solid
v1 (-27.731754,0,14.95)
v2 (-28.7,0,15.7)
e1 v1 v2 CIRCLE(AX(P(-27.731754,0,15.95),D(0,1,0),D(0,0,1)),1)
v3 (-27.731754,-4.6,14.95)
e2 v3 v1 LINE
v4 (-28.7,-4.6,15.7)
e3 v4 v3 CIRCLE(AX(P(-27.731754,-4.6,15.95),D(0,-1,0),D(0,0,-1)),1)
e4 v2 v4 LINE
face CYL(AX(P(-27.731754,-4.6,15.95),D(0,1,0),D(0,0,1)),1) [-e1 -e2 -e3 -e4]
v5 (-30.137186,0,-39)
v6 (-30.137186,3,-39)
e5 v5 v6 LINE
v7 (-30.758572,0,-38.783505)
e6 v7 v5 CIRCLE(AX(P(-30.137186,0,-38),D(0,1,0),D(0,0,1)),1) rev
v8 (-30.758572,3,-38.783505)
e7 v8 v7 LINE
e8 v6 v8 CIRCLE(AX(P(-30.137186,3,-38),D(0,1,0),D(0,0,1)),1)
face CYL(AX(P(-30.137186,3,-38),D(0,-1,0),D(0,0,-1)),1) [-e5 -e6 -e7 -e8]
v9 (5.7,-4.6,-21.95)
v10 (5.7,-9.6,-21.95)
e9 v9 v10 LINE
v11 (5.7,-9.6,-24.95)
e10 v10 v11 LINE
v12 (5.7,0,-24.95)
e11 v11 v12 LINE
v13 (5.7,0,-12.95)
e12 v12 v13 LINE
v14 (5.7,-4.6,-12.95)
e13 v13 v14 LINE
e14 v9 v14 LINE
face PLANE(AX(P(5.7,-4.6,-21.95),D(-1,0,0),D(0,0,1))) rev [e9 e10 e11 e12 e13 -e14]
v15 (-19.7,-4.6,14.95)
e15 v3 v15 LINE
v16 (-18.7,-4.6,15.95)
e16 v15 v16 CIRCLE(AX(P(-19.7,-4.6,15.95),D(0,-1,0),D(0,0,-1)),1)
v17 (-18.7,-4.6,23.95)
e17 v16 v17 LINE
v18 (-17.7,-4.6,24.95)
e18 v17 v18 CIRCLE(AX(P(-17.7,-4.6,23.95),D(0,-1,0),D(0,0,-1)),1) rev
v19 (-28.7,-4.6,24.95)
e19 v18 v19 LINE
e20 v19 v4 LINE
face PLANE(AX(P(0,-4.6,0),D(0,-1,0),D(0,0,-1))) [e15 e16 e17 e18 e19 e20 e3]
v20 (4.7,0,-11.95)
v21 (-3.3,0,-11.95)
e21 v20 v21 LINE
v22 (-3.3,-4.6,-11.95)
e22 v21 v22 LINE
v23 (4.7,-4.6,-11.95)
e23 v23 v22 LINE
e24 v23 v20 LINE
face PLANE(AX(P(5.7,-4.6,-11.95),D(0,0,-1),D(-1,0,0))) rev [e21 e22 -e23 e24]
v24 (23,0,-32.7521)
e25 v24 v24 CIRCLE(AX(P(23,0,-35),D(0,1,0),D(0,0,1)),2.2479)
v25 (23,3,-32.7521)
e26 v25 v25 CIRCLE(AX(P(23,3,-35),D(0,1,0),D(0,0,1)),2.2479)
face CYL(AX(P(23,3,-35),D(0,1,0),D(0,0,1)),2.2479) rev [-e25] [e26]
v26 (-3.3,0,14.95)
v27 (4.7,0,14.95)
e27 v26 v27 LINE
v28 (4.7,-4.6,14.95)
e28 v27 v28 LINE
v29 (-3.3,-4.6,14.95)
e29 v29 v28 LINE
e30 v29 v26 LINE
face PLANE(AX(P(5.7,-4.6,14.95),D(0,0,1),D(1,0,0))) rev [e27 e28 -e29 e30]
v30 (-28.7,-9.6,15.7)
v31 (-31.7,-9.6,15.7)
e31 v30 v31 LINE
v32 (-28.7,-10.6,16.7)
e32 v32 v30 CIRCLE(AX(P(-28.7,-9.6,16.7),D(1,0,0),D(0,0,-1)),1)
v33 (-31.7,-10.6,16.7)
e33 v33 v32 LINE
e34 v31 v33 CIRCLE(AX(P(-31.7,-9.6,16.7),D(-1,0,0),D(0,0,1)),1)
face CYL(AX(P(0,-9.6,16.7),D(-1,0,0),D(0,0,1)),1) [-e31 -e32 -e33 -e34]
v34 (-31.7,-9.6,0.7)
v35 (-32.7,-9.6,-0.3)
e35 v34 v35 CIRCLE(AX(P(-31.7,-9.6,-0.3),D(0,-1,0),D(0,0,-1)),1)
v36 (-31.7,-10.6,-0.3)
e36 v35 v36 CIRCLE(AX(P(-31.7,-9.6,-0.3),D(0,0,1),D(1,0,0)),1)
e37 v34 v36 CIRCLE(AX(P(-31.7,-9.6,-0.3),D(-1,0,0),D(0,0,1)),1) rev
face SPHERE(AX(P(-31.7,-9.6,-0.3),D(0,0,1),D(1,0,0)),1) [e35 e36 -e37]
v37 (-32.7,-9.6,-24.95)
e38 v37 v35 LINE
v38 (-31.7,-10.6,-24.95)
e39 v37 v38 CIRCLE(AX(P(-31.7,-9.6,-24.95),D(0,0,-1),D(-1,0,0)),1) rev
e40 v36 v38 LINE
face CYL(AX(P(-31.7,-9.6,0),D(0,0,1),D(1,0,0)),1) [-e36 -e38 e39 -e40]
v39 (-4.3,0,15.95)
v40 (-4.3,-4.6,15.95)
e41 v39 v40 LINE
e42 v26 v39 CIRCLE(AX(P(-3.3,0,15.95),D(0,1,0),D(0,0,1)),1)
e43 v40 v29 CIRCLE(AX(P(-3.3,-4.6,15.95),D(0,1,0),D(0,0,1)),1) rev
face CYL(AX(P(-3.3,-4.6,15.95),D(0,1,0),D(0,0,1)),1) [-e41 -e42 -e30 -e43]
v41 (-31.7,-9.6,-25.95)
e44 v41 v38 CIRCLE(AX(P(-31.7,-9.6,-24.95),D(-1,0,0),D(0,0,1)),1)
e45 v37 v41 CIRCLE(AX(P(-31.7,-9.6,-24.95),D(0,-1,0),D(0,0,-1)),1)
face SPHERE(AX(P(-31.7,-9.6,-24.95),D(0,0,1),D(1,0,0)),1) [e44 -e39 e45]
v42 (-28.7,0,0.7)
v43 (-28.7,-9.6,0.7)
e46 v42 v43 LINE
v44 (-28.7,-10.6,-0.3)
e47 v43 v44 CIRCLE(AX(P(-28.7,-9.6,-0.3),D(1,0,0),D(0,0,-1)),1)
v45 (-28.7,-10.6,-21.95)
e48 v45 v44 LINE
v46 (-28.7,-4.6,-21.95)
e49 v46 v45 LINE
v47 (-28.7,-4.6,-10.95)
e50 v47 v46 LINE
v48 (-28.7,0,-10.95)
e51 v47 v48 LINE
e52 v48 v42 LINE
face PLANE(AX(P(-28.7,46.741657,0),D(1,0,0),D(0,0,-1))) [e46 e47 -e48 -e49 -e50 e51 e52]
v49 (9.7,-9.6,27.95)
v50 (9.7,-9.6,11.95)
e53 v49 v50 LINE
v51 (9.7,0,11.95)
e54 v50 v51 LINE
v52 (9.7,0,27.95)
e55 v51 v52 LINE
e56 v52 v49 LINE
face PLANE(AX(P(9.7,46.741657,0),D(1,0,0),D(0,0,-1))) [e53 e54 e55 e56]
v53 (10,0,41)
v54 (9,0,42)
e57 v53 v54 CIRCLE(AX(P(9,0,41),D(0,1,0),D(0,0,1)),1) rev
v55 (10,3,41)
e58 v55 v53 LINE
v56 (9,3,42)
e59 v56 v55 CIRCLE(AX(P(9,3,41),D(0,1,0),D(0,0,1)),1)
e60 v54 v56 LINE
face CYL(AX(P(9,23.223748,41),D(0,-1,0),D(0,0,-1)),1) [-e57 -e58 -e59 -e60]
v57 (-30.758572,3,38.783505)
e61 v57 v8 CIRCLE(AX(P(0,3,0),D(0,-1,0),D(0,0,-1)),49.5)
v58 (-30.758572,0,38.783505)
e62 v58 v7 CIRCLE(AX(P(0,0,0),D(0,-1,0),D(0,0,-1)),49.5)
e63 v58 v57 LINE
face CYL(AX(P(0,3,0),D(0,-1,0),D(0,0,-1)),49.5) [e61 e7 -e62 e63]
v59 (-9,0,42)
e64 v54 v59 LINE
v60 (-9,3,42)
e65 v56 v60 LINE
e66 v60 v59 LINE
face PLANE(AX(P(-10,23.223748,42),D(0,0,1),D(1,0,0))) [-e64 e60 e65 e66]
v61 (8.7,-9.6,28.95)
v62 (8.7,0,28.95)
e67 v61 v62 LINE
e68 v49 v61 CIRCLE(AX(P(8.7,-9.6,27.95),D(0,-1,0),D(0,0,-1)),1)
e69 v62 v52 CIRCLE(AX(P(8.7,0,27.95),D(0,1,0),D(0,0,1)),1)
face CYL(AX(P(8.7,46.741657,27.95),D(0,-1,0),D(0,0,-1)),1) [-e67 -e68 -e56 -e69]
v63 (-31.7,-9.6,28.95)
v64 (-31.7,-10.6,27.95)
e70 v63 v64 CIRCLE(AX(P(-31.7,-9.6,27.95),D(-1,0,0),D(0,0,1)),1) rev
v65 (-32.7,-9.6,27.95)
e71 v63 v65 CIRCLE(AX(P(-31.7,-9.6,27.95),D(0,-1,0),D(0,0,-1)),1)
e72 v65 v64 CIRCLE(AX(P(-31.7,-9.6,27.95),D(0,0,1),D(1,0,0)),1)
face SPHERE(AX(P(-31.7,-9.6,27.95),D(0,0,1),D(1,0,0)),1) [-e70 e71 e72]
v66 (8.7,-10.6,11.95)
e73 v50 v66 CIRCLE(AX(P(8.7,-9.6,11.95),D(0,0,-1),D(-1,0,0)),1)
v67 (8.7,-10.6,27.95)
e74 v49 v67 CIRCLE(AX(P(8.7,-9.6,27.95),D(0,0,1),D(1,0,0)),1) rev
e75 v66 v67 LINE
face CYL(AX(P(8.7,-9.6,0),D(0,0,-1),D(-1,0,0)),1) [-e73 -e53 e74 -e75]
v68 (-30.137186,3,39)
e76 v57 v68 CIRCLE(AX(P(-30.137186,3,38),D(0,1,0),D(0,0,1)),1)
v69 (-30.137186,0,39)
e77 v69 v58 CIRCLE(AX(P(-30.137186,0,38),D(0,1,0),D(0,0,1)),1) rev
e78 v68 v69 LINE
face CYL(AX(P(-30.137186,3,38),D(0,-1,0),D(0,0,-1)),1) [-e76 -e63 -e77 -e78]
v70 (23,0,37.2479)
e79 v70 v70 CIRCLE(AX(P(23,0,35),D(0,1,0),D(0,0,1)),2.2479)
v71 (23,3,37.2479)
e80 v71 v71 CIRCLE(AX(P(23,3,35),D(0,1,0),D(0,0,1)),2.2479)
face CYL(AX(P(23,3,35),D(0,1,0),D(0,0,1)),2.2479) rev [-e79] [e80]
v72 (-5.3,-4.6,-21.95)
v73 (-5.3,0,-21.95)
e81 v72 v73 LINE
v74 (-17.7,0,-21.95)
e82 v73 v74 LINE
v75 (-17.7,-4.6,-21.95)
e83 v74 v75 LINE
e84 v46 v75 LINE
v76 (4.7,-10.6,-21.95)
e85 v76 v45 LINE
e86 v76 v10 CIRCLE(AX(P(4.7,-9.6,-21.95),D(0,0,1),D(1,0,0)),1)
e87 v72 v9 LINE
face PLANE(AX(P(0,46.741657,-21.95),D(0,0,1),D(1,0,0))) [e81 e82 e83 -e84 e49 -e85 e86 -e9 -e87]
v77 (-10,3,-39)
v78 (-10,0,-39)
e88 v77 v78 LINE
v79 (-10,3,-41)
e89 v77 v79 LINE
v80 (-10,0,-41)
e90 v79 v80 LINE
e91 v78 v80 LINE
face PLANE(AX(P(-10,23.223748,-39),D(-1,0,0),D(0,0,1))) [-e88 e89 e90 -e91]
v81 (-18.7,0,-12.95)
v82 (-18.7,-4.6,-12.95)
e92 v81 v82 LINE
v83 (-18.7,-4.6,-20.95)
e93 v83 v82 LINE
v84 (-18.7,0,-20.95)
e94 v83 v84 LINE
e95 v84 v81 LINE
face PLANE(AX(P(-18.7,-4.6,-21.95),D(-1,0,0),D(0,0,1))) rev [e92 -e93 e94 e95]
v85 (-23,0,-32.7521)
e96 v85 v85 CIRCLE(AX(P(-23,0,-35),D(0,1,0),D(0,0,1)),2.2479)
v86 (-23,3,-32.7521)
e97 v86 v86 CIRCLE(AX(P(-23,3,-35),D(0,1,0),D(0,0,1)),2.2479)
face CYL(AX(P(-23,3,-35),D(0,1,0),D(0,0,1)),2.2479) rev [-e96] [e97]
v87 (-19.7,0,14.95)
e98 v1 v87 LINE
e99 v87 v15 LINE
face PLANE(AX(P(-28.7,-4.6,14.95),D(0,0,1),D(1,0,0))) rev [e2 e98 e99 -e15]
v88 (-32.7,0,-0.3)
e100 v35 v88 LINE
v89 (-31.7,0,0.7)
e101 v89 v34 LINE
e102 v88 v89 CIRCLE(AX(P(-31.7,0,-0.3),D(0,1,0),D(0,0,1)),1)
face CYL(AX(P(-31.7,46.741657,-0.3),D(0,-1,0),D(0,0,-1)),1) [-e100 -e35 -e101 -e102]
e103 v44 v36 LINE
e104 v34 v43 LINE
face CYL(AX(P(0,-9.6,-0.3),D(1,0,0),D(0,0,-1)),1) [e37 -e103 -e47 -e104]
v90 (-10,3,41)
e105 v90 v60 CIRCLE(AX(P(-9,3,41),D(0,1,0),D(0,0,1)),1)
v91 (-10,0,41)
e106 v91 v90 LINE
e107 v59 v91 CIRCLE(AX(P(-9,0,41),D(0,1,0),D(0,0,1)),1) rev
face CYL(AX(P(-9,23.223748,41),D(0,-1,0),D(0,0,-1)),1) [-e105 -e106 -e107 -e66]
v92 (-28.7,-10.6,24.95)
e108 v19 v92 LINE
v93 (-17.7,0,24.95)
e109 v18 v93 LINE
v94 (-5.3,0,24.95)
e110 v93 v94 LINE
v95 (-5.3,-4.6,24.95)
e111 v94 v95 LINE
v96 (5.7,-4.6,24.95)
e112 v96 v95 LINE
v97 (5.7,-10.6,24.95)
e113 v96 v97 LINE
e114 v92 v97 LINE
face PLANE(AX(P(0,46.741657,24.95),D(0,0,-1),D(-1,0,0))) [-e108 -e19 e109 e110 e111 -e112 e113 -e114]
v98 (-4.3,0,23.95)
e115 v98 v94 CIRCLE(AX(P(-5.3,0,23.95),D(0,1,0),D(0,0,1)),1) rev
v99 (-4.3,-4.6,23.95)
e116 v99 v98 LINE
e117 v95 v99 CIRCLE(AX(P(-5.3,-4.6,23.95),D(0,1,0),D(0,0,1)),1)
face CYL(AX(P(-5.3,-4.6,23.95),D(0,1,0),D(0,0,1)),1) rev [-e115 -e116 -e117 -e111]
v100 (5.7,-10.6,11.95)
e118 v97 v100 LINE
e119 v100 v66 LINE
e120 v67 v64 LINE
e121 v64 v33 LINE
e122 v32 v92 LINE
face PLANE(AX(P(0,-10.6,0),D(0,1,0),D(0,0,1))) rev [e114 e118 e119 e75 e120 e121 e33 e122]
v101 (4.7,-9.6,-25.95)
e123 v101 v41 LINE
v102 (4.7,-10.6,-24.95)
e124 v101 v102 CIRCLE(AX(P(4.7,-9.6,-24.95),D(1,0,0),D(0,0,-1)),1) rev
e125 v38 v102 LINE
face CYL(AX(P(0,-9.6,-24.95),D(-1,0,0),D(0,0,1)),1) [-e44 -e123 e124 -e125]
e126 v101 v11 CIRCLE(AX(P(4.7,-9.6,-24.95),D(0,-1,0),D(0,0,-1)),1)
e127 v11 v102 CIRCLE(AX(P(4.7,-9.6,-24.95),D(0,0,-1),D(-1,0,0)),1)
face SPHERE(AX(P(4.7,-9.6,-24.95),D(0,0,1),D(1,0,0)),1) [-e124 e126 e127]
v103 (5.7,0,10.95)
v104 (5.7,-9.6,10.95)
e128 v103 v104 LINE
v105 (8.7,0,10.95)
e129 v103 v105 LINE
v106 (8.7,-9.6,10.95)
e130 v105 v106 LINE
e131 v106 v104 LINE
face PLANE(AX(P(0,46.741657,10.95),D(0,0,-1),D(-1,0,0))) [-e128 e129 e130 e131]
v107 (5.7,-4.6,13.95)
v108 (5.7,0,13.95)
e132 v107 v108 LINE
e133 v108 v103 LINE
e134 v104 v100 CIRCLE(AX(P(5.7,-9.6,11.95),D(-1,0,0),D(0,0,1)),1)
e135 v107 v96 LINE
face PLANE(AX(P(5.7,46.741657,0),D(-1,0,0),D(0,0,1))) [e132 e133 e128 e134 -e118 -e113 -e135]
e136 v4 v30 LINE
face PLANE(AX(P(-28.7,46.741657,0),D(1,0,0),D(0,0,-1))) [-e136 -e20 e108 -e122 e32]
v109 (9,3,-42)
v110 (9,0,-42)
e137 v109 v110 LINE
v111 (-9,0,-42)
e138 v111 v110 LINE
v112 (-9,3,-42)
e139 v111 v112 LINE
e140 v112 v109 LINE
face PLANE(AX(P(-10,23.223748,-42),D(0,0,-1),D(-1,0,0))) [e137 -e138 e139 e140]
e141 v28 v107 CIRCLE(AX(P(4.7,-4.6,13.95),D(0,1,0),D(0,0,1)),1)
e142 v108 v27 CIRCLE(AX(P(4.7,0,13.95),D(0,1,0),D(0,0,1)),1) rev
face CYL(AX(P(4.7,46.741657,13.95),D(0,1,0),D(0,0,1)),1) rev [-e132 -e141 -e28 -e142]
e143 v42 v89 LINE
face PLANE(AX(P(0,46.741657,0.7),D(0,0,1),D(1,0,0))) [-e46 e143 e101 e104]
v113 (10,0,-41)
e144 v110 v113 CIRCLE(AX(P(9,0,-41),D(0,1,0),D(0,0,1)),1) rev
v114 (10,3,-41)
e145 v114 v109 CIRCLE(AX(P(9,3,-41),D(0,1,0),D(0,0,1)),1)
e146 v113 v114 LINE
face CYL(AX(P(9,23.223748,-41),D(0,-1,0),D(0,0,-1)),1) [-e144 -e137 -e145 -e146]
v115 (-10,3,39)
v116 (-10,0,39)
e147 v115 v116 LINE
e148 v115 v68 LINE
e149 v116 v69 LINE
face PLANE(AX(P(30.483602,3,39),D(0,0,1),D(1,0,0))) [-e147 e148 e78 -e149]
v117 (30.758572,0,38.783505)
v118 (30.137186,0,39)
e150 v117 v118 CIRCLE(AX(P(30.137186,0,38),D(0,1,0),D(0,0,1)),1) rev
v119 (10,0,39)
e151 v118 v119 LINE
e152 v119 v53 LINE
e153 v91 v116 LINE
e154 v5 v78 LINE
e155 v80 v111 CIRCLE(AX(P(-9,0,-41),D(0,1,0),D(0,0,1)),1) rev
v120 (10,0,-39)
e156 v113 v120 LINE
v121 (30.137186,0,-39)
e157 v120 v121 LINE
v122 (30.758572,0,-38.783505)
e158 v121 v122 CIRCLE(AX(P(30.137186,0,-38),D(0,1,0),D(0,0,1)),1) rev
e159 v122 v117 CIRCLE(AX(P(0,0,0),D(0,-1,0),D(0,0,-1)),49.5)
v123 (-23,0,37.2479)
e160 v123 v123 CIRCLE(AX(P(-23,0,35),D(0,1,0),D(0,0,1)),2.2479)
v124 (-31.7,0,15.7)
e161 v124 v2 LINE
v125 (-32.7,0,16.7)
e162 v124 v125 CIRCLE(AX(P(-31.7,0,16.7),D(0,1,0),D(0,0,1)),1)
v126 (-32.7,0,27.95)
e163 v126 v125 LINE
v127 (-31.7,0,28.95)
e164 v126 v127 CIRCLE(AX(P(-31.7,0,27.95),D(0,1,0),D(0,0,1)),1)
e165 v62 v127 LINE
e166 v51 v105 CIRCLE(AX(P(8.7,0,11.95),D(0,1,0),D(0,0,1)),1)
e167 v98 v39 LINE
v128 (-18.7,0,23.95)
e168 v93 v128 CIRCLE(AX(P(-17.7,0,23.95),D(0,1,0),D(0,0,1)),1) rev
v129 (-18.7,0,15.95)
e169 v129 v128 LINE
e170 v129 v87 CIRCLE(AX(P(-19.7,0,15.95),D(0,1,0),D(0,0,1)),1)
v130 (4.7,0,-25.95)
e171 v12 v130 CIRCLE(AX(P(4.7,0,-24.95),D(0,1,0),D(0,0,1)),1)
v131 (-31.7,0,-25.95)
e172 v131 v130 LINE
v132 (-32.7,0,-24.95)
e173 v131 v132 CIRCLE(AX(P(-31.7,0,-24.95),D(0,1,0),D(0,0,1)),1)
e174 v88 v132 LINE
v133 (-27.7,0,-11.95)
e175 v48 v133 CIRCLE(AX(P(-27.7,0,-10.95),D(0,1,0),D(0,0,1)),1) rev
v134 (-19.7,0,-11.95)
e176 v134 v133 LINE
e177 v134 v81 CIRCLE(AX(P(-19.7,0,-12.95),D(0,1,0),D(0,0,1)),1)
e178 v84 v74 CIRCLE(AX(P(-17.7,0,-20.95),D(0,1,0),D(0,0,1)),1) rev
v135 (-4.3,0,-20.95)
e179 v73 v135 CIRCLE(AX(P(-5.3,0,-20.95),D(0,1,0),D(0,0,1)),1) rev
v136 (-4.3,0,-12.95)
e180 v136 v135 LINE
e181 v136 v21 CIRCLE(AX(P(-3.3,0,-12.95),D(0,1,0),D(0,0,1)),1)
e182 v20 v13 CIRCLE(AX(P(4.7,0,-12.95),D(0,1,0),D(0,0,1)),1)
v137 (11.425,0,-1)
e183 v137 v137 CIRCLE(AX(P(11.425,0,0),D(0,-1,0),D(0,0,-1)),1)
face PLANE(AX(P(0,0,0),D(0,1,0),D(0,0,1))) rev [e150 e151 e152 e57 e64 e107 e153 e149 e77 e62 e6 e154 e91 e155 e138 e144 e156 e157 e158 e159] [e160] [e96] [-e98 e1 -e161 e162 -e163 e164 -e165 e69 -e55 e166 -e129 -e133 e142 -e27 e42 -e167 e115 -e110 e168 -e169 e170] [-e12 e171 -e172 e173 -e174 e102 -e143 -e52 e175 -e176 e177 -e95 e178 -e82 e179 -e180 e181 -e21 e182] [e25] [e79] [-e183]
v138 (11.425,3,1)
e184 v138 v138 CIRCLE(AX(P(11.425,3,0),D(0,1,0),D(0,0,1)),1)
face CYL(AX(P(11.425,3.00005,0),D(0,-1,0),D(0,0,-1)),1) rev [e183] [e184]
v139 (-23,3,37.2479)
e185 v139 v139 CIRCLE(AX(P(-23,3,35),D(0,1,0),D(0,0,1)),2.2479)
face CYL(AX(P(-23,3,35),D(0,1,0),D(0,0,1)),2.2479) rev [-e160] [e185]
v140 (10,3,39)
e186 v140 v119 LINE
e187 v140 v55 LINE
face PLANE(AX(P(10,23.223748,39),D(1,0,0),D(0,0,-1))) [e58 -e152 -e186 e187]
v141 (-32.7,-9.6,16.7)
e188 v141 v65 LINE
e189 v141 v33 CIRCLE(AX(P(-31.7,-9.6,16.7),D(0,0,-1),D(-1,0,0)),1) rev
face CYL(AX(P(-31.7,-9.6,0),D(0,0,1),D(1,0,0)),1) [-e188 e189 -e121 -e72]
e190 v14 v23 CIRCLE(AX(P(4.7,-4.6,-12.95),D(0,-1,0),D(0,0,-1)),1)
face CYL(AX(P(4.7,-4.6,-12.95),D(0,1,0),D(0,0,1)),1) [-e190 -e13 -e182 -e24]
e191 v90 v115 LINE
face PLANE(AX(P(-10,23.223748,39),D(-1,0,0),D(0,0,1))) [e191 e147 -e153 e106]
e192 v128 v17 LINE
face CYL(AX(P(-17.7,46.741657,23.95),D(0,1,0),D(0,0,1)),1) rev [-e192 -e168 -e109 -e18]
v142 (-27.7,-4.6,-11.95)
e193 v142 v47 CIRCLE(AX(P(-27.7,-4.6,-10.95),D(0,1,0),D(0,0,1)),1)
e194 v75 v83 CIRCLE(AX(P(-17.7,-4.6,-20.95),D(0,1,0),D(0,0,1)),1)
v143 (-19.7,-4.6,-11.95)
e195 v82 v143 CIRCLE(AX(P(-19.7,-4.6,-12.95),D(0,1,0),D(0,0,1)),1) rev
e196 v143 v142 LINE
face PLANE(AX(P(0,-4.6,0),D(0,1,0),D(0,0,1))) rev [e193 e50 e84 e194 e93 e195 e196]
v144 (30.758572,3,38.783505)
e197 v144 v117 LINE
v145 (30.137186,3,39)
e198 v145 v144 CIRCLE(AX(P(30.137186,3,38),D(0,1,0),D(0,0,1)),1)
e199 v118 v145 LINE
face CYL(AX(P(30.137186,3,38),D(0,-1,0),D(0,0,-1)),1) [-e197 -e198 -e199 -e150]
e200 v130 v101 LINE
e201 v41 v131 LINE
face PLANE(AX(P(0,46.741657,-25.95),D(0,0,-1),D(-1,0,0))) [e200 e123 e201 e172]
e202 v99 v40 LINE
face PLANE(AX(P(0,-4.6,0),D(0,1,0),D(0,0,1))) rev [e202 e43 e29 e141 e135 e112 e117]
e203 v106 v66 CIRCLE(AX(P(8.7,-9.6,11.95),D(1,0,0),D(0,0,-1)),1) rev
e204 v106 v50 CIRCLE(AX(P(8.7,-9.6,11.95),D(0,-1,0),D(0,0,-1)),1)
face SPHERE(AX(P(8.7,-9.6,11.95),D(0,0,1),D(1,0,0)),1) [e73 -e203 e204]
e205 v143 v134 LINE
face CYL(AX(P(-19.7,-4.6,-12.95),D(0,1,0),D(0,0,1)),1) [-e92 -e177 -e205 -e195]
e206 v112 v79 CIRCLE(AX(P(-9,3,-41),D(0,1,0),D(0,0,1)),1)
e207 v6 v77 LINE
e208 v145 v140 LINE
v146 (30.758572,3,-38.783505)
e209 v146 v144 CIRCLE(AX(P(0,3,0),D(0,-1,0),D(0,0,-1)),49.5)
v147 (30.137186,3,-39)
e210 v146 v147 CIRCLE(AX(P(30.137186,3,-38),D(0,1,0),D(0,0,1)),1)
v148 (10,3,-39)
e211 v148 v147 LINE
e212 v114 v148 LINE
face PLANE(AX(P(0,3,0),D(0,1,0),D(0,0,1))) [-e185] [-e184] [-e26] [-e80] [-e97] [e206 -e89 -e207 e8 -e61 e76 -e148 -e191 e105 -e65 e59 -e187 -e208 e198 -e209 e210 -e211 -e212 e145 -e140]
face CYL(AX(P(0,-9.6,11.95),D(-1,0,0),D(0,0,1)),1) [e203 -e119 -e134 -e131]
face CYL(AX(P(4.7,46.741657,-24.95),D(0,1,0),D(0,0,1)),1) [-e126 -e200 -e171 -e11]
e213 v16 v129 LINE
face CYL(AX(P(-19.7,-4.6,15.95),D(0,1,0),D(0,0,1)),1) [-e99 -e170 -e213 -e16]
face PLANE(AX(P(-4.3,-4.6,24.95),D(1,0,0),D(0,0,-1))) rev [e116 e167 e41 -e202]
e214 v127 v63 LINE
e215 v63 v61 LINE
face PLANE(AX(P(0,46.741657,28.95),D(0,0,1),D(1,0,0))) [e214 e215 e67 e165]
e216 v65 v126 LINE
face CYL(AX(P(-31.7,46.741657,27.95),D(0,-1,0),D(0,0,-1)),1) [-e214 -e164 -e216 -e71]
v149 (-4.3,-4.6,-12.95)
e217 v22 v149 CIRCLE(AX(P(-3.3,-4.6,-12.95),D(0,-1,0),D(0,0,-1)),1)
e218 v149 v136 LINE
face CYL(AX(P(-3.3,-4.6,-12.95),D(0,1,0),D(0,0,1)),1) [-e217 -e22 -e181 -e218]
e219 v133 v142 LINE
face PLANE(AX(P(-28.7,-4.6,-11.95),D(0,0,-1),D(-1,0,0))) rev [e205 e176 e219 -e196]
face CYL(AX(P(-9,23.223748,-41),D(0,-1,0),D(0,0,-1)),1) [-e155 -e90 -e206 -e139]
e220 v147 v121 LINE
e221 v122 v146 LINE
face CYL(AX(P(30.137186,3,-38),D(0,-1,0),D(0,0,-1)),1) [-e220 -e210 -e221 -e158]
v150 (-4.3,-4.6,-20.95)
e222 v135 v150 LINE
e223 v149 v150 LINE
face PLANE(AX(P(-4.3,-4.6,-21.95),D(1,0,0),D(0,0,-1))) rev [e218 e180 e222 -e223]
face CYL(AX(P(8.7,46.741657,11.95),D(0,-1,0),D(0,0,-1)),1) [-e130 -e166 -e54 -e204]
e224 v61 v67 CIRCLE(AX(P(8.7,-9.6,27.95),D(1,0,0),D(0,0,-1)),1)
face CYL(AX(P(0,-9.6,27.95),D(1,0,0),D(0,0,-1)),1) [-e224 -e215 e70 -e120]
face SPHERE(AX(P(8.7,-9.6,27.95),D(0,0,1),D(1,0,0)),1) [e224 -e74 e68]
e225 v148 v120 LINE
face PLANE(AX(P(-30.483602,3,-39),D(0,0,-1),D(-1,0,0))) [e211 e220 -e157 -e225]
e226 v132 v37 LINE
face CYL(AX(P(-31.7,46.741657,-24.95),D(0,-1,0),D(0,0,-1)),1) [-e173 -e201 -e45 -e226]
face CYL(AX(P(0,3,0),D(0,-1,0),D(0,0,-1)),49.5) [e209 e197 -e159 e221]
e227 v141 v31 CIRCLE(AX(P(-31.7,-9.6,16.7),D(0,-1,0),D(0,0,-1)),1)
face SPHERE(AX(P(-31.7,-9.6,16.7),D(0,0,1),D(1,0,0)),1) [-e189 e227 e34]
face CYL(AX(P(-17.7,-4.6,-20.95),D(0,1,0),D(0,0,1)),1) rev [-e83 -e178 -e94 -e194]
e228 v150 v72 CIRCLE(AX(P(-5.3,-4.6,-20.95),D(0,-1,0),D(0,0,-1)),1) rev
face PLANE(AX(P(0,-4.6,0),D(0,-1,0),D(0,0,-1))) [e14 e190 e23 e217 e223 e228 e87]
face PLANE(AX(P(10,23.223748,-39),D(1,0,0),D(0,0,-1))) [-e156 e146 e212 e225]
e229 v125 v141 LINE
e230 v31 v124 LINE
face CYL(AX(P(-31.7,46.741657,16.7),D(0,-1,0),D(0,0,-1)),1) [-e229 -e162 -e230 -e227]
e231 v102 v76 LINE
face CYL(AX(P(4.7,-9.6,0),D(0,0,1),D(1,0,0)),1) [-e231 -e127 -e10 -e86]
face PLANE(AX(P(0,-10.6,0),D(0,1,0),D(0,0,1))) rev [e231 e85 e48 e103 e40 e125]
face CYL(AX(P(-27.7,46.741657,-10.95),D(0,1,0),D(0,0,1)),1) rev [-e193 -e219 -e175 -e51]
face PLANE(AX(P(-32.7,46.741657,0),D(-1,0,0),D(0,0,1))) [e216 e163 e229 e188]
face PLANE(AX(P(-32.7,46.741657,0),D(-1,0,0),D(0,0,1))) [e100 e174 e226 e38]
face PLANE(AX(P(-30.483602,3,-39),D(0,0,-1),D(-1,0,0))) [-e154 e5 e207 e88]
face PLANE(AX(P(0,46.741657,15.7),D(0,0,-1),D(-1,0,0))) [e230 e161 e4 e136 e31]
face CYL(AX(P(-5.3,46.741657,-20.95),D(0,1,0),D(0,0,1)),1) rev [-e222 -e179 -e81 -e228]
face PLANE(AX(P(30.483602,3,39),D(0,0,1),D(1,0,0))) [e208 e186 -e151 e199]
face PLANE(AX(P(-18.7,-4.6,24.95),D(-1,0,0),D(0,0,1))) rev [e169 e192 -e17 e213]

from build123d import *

# Parameters (mm, degrees)
A_BASE_T42_OUTLINE_R       = 2.2479
A_BASE_T42_OUTLINE_R_2     = 1
A_BASE_T42_DEPTH           = 3
OUTER_RIM_CUT_DEPTH        = 68.299702823
SKETCH2_W                  = 20
SKETCH2_H                  = 3
FLANGES_DEPTH              = 3
CONTOURING_R               = 1
SKETCH9_R                  = 1
SINGLE_TENDON_PORT_DEPTH   = 65.986537067
SKETCH3_W                  = 15
SKETCH3_H                  = 3
SKETCH3_W_2                = 3
SKETCH3_H_2                = 15
BASE_SUPPORTS_DEPTH        = 3
BASE_SUPPORTS_CHAMFER_SIZE = 3
SKETCH10_R                 = 1
COVER_DEPTH                = 3
SKETCH11_W                 = 15
SKETCH11_H                 = 6
SKETCH11_W_2               = 6
SKETCH11_H_2               = 15
CUT_EXTRUDE1_DEPTH         = 10
SKETCH14_W                 = 10
SKETCH14_H                 = 10
BOSS_EXTRUDE2_DEPTH        = 4.6
BOSS_EXTRUDE3_DEPTH        = 10.6
FILLET1_R                  = 1


with BuildPart() as part:
    # a_base_t42: read off the stored shape, not the designer's step
    # a_base_t42 outline → a_base_t42 (new body)
    with BuildSketch(Plane(origin=(0, 0, 0), x_dir=(1, 0, 0), z_dir=(0, 1, 0))):
        with BuildLine():
            ThreePointArc((31.5, -42), (52.5, 0), (31.5, 42))
            Line((31.5, 42), (-31.5, 42))
            ThreePointArc((-31.5, 42), (-52.5, 0), (-31.5, -42))
            Line((-31.5, -42), (31.5, -42))
        make_face()
        with Locations((-23, -35)):
            Circle(A_BASE_T42_OUTLINE_R, mode=Mode.SUBTRACT)
        with Locations((23, -35)):
            Circle(A_BASE_T42_OUTLINE_R, mode=Mode.SUBTRACT)
        with Locations((-40.25, 0)):
            Circle(A_BASE_T42_OUTLINE_R_2, mode=Mode.SUBTRACT)
        with Locations((-23, 35)):
            Circle(A_BASE_T42_OUTLINE_R, mode=Mode.SUBTRACT)
        with Locations((40.25, 0)):
            Circle(A_BASE_T42_OUTLINE_R_2, mode=Mode.SUBTRACT)
        with Locations((23, 35)):
            Circle(A_BASE_T42_OUTLINE_R, mode=Mode.SUBTRACT)
    extrude(amount=A_BASE_T42_DEPTH)

    # Sketch1 → Outer Rim Cut (cut, through all)
    with BuildSketch(Plane.XZ):
        with BuildLine():
            Line((31.5, 42), (-31.5, 42))
            ThreePointArc((-31.5, 42), (-52.5, 0), (-31.5, -42))
            Line((-31.5, -42), (31.5, -42))
            ThreePointArc((31.5, -42), (52.5, 0), (31.5, 42))
        make_face()
        with BuildLine():
            Line((30.483602149, 39), (-30.483602149, 39))
            ThreePointArc((-30.483602149, 39), (-49.5, 0), (-30.483602149, -39))
            Line((-30.483602149, -39), (30.483602149, -39))
            ThreePointArc((30.483602149, -39), (49.5, 0), (30.483602149, 39))
        make_face(mode=Mode.SUBTRACT)
    extrude(amount=-OUTER_RIM_CUT_DEPTH, mode=Mode.SUBTRACT)

    # Sketch2 → Flanges (add)
    with BuildSketch(Plane.XZ):
        with Locations((0, -40.5)):
            Rectangle(SKETCH2_W, SKETCH2_H)
        with Locations((0, 40.5)):
            Rectangle(SKETCH2_W, SKETCH2_H)
    extrude(amount=-FLANGES_DEPTH)

    # Contouring
    contouring_edges = [part.edges().sort_by_distance(p)[0] for p in [
        (30.483602149, 1.5, -39),
        (-30.483602149, 1.5, -39),
        (10, 1.5, -42),
        (-10, 1.5, -42),
        (30.483602149, 1.5, 39),
        (-30.483602149, 1.5, 39),
        (10, 1.5, 42),
        (-10, 1.5, 42),
    ]]
    fillet(contouring_edges, radius=CONTOURING_R)

    # Sketch9 → Single Tendon Port (cut, through all)
    with BuildSketch(Plane.XZ):
        with Locations(Location((11.425, 0, 0), (0, 0, 270))):
            Circle(SKETCH9_R)
    extrude(amount=-SINGLE_TENDON_PORT_DEPTH, mode=Mode.SUBTRACT)

    # Sketch3 → Base Supports (add)
    with BuildSketch(Plane.XZ):
        with Locations((-25.325, -27)):
            Rectangle(SKETCH3_W, SKETCH3_H)
        with Locations((-25.325, 27)):
            Rectangle(SKETCH3_W, SKETCH3_H)
        with Locations((-34.325, -12.5)):
            Rectangle(SKETCH3_W_2, SKETCH3_H_2)
        with Locations((-34.325, 12.5)):
            Rectangle(SKETCH3_W_2, SKETCH3_H_2)
    extrude(amount=BASE_SUPPORTS_DEPTH)

    # Base Supports Chamfer
    # the kernel refuses this chamfer: 3 mm, written as the material it adds along each edge
    with BuildSketch(Plane(origin=(-32.825, 0, 28.5), x_dir=(0, 0, 1), z_dir=(1, 0, 0))) as base_supports_chamfer_piece_1_section:
        Polygon((BASE_SUPPORTS_CHAMFER_SIZE, 0), (0, BASE_SUPPORTS_CHAMFER_SIZE), (0, 0), align=None)
    base_supports_chamfer_piece_1 = extrude(amount=15, mode=Mode.PRIVATE)
    base_supports_chamfer_piece_1 = split(base_supports_chamfer_piece_1, bisect_by=Plane(origin=(-32.825, -3, 28.5), z_dir=(0, 1, 0)), keep=Keep.TOP, mode=Mode.PRIVATE)
    add(base_supports_chamfer_piece_1)
    with BuildSketch(Plane(origin=(-17.825, 0, -28.5), x_dir=(0, 0, -1), z_dir=(-1, 0, 0))) as base_supports_chamfer_piece_2_section:
        Polygon((BASE_SUPPORTS_CHAMFER_SIZE, 0), (0, BASE_SUPPORTS_CHAMFER_SIZE), (0, 0), align=None)
    base_supports_chamfer_piece_2 = extrude(amount=15, mode=Mode.PRIVATE)
    base_supports_chamfer_piece_2 = split(base_supports_chamfer_piece_2, bisect_by=Plane(origin=(-17.825, -3, -28.5), z_dir=(0, 1, 0)), keep=Keep.TOP, mode=Mode.PRIVATE)
    add(base_supports_chamfer_piece_2)
    with BuildSketch(Plane(origin=(-35.825, 0, 20), x_dir=(-1, 0, 0), z_dir=(0, 0, -1))) as base_supports_chamfer_piece_3_section:
        Polygon((BASE_SUPPORTS_CHAMFER_SIZE, 0), (0, -BASE_SUPPORTS_CHAMFER_SIZE), (0, 0), align=None)
    base_supports_chamfer_piece_3 = extrude(amount=15, mode=Mode.PRIVATE)
    base_supports_chamfer_piece_3 = split(base_supports_chamfer_piece_3, bisect_by=Plane(origin=(-35.825, -3, 20), z_dir=(0, 1, 0)), keep=Keep.TOP, mode=Mode.PRIVATE)
    add(base_supports_chamfer_piece_3)
    with BuildSketch(Plane(origin=(-35.825, 0, -20), x_dir=(-1, 0, 0), z_dir=(0, 0, 1))) as base_supports_chamfer_piece_4_section:
        Polygon((BASE_SUPPORTS_CHAMFER_SIZE, 0), (0, BASE_SUPPORTS_CHAMFER_SIZE), (0, 0), align=None)
    base_supports_chamfer_piece_4 = extrude(amount=15, mode=Mode.PRIVATE)
    base_supports_chamfer_piece_4 = split(base_supports_chamfer_piece_4, bisect_by=Plane(origin=(-35.825, -3, -20), z_dir=(0, 1, 0)), keep=Keep.TOP, mode=Mode.PRIVATE)
    add(base_supports_chamfer_piece_4)

    # Sketch10 → Cover (add)
    with BuildSketch(Plane.XZ):
        with Locations((-40.25, 0)):
            Circle(SKETCH10_R)
        with Locations((40.25, 0)):
            Circle(SKETCH10_R)
    extrude(amount=-COVER_DEPTH)

    # Sketch11 → Cut-Extrude1 (cut)
    with BuildSketch(Plane.XZ):
        with Locations((-25.325, 28.5)):
            Rectangle(SKETCH11_W, SKETCH11_H)
        with Locations((-35.825, 12.5)):
            Rectangle(SKETCH11_W_2, SKETCH11_H_2)
        with Locations((-35.825, -12.5)):
            Rectangle(SKETCH11_W_2, SKETCH11_H_2)
        with Locations((-25.325, -28.5)):
            Rectangle(SKETCH11_W, SKETCH11_H)
    extrude(amount=CUT_EXTRUDE1_DEPTH, mode=Mode.SUBTRACT)

    # Sketch14 → Boss-Extrude2 (add)
    with BuildSketch(Plane.XZ):
        with Locations((-23.7, 19.95)):
            Rectangle(SKETCH14_W, SKETCH14_H)
        with Locations((0.7, 19.95)):
            Rectangle(SKETCH14_W, SKETCH14_H)
        with Locations((0.7, -16.95)):
            Rectangle(SKETCH14_W, SKETCH14_H)
        with Locations((-23.7, -16.95)):
            Rectangle(SKETCH14_W, SKETCH14_H)
    extrude(amount=BOSS_EXTRUDE2_DEPTH)

    # Sketch15 → Boss-Extrude3 (add)
    with BuildSketch(Plane.XZ):
        Polygon((-28.7, 24.95), (-28.7, 15.7), (-32.7, 15.7), (-32.7, 28.95), (9.7, 28.95), (9.7, 10.95), (5.7, 10.95), (5.7, 24.95), align=None)
        Polygon((-28.7, -21.95), (-28.7, 0.7), (-32.7, 0.7), (-32.7, -25.95), (5.7, -25.95), (5.7, -21.95), align=None)
    extrude(amount=BOSS_EXTRUDE3_DEPTH)

    # Fillet1
    # the kernel refuses this fillet: 1 mm, written as the material it adds along each edge
    with BuildSketch(Plane(origin=(-18.7, 2.5, 24.95), x_dir=(1, 0, 0), z_dir=(0, -1, 0)), Plane(origin=(-4.3, 2.5, 24.95), x_dir=(0, 0, -1), z_dir=(0, -1, 0)), Plane(origin=(5.7, 2.5, 14.95), x_dir=(0, 0, -1), z_dir=(0, -1, 0)), Plane(origin=(-4.3, 2.5, -21.95), x_dir=(-1, 0, 0), z_dir=(0, -1, 0)), Plane(origin=(-18.7, 2.5, -21.95), x_dir=(0, 0, 1), z_dir=(0, -1, 0)), Plane(origin=(-28.7, 2.5, -11.95), x_dir=(0, 0, 1), z_dir=(0, -1, 0))) as fillet1_piece_1:
        with BuildLine():
            CenterArc((FILLET1_R, -FILLET1_R), FILLET1_R, 90, 90)
            Line((0, -FILLET1_R), (0, 0))
            Line((0, 0), (FILLET1_R, 0))
        make_face()
    extrude(amount=7.1)
    # the kernel refuses this fillet: 1 mm, written as the material it takes off along each edge
    with BuildSketch(Plane(origin=(-31.7, -9.6, -0.3), x_dir=(0, 0, 1), z_dir=(0, -1, 0))) as fillet1_2_piece_1_section:
        Polygon((0, 0), (FILLET1_R * 1.02, 0), (FILLET1_R * 1.02, FILLET1_R * 1.02), (0, FILLET1_R * 1.02), align=None)
    fillet1_2_piece_1 = extrude(amount=FILLET1_R * 1.02, mode=Mode.PRIVATE)
    fillet1_2_piece_1 = fillet1_2_piece_1 - Plane(origin=(-31.7, -9.6, -0.3), x_dir=(0.7071067811865477, 0, -0.7071067811865475), z_dir=(0, -1, 0)) * Sphere(FILLET1_R, mode=Mode.PRIVATE)
    add(fillet1_2_piece_1, mode=Mode.SUBTRACT)
    with BuildSketch(Plane(origin=(-31.7, -9.6, -24.95), x_dir=(-1, 0, 0), z_dir=(0, -1, 0))) as fillet1_2_piece_2_section:
        Polygon((0, 0), (FILLET1_R * 1.02, 0), (FILLET1_R * 1.02, FILLET1_R * 1.02), (0, FILLET1_R * 1.02), align=None)
    fillet1_2_piece_2 = extrude(amount=FILLET1_R * 1.02, mode=Mode.PRIVATE)
    fillet1_2_piece_2 = fillet1_2_piece_2 - Plane(origin=(-31.7, -9.6, -24.95), x_dir=(0.7071067811865475, 0, 0.7071067811865475), z_dir=(0, -1, 0)) * Sphere(FILLET1_R, mode=Mode.PRIVATE)
    add(fillet1_2_piece_2, mode=Mode.SUBTRACT)
    with BuildSketch(Plane(origin=(4.7, -9.6, -24.95), x_dir=(0, 0, -1), z_dir=(0, -1, 0))) as fillet1_2_piece_3_section:
        Polygon((0, 0), (FILLET1_R * 1.02, 0), (FILLET1_R * 1.02, FILLET1_R * 1.02), (0, FILLET1_R * 1.02), align=None)
    fillet1_2_piece_3 = extrude(amount=FILLET1_R * 1.02, mode=Mode.PRIVATE)
    fillet1_2_piece_3 = fillet1_2_piece_3 - Plane(origin=(4.7, -9.6, -24.95), x_dir=(-0.7071067811865475, 0, 0.7071067811865475), z_dir=(0, -1, 0)) * Sphere(FILLET1_R, mode=Mode.PRIVATE)
    add(fillet1_2_piece_3, mode=Mode.SUBTRACT)
    with BuildSketch(Plane(origin=(8.7, -9.6, 27.95), x_dir=(1, 0, 0), z_dir=(0, -1, 0))) as fillet1_2_piece_4_section:
        Polygon((0, 0), (FILLET1_R * 1.02, 0), (FILLET1_R * 1.02, FILLET1_R * 1.02), (0, FILLET1_R * 1.02), align=None)
    fillet1_2_piece_4 = extrude(amount=FILLET1_R * 1.02, mode=Mode.PRIVATE)
    fillet1_2_piece_4 = fillet1_2_piece_4 - Plane(origin=(8.7, -9.6, 27.95), x_dir=(-0.7071067811865475, 0, -0.7071067811865475), z_dir=(0, -1, 0)) * Sphere(FILLET1_R, mode=Mode.PRIVATE)
    add(fillet1_2_piece_4, mode=Mode.SUBTRACT)
    with BuildSketch(Plane(origin=(8.7, -9.6, 11.95), x_dir=(1, 0, 0), z_dir=(0, -1, 0))) as fillet1_2_piece_5_section:
        Polygon((0, 0), (FILLET1_R * 1.02, 0), (FILLET1_R * 1.02, -FILLET1_R * 1.02), (0, -FILLET1_R * 1.02), align=None)
    fillet1_2_piece_5 = extrude(amount=FILLET1_R * 1.02, mode=Mode.PRIVATE)
    fillet1_2_piece_5 = fillet1_2_piece_5 - Plane(origin=(8.7, -9.6, 11.95), x_dir=(-0.7071067811865475, 0, 0.7071067811865475), z_dir=(0, -1, 0)) * Sphere(FILLET1_R, mode=Mode.PRIVATE)
    add(fillet1_2_piece_5, mode=Mode.SUBTRACT)
    with BuildSketch(Plane(origin=(-31.7, -9.6, 16.7), x_dir=(-1, 0, 0), z_dir=(0, -1, 0))) as fillet1_2_piece_6_section:
        Polygon((0, 0), (FILLET1_R * 1.02, 0), (FILLET1_R * 1.02, FILLET1_R * 1.02), (0, FILLET1_R * 1.02), align=None)
    fillet1_2_piece_6 = extrude(amount=FILLET1_R * 1.02, mode=Mode.PRIVATE)
    fillet1_2_piece_6 = fillet1_2_piece_6 - Plane(origin=(-31.7, -9.6, 16.7), x_dir=(0.7071067811865475, 0, 0.7071067811865475), z_dir=(0, -1, 0)) * Sphere(FILLET1_R, mode=Mode.PRIVATE)
    add(fillet1_2_piece_6, mode=Mode.SUBTRACT)
    with BuildSketch(Plane(origin=(-31.7, -9.6, 27.95), x_dir=(0, 0, 1), z_dir=(0, -1, 0))) as fillet1_2_piece_7_section:
        Polygon((0, 0), (FILLET1_R * 1.02, 0), (FILLET1_R * 1.02, FILLET1_R * 1.02), (0, FILLET1_R * 1.02), align=None)
    fillet1_2_piece_7 = extrude(amount=FILLET1_R * 1.02, mode=Mode.PRIVATE)
    fillet1_2_piece_7 = fillet1_2_piece_7 - Plane(origin=(-31.7, -9.6, 27.95), x_dir=(0.7071067811865475, 0, -0.7071067811865475), z_dir=(0, -1, 0)) * Sphere(FILLET1_R, mode=Mode.PRIVATE)
    add(fillet1_2_piece_7, mode=Mode.SUBTRACT)
    with BuildSketch(Plane(origin=(-4.3, 0, 14.95), x_dir=(0, 0, 1), z_dir=(0, -1, 0)), Plane(origin=(5.7, 0, -11.95), x_dir=(0, 0, -1), z_dir=(0, -1, 0)), Plane(origin=(-4.3, 0, -11.95), x_dir=(1, 0, 0), z_dir=(0, -1, 0)), Plane(origin=(-18.7, 0, 14.95), x_dir=(-1, 0, 0), z_dir=(0, -1, 0))) as fillet1_2_piece_8:
        with BuildLine():
            CenterArc((FILLET1_R, -FILLET1_R), FILLET1_R, 90, 90)
            Line((0, -FILLET1_R), (0, 0))
            Line((0, 0), (FILLET1_R, 0))
        make_face()
    extrude(amount=7.1, mode=Mode.SUBTRACT)
    with BuildSketch(Plane(origin=(-18.7, 0, -11.95), x_dir=(-1, 0, 0), z_dir=(0, -1, 0))) as fillet1_2_piece_9:
        with BuildLine():
            CenterArc((FILLET1_R, FILLET1_R), FILLET1_R, 180, 90)
            Line((0, FILLET1_R), (0, 0))
            Line((0, 0), (FILLET1_R, 0))
        make_face()
    extrude(amount=7.1, mode=Mode.SUBTRACT)
    with BuildSketch(Plane(origin=(-28.7, 0, 14.95), x_dir=(0, 0, 1), z_dir=(0, -1, 0))) as fillet1_2_piece_10:
        with BuildLine():
            CenterArc((1, -0.968245837), FILLET1_R, 104.477512186, 75.522487814)
            Line((0, -0.968245837), (0, 0))
            Line((0, 0), (0.75, 0))
        make_face()
    extrude(amount=7.020614591, mode=Mode.SUBTRACT)
    with BuildSketch(Plane(origin=(-32.7, -10.6, -0.3), x_dir=(1, 0, 0), z_dir=(0, 0, -1))) as fillet1_2_piece_11:
        with BuildLine():
            CenterArc((FILLET1_R, -FILLET1_R), FILLET1_R, 90, 90)
            Line((0, -FILLET1_R), (0, 0))
            Line((0, 0), (FILLET1_R, 0))
        make_face()
    extrude(amount=24.65, mode=Mode.SUBTRACT)
    with BuildSketch(Plane(origin=(-31.7, -10.6, -25.95), x_dir=(0, 0, 1), z_dir=(1, 0, 0))) as fillet1_2_piece_12:
        with BuildLine():
            CenterArc((FILLET1_R, -FILLET1_R), FILLET1_R, 90, 90)
            Line((0, -FILLET1_R), (0, 0))
            Line((0, 0), (FILLET1_R, 0))
        make_face()
    extrude(amount=36.4, mode=Mode.SUBTRACT)
    with BuildSketch(Plane(origin=(5.7, -10.6, -24.95), x_dir=(-1, 0, 0), z_dir=(0, 0, 1)), Plane(origin=(-26.2, -10.6, 0.7), x_dir=(0, 0, -1), z_dir=(-1, 0, 0))) as fillet1_2_piece_13:
        with BuildLine():
            CenterArc((FILLET1_R, -FILLET1_R), FILLET1_R, 90, 90)
            Line((0, -FILLET1_R), (0, 0))
            Line((0, 0), (FILLET1_R, 0))
        make_face()
    extrude(amount=5.5, mode=Mode.SUBTRACT)
    with BuildSketch(Plane(origin=(9.7, -10.6, 27.95), x_dir=(-1, 0, 0), z_dir=(0, 0, -1))) as fillet1_2_piece_14:
        with BuildLine():
            CenterArc((FILLET1_R, FILLET1_R), FILLET1_R, 180, 90)
            Line((0, FILLET1_R), (0, 0))
            Line((0, 0), (FILLET1_R, 0))
        make_face()
    extrude(amount=16, mode=Mode.SUBTRACT)
    with BuildSketch(Plane(origin=(-32.7, -10.6, 16.7), x_dir=(1, 0, 0), z_dir=(0, 0, 1))) as fillet1_2_piece_15:
        with BuildLine():
            CenterArc((FILLET1_R, FILLET1_R), FILLET1_R, 180, 90)
            Line((0, FILLET1_R), (0, 0))
            Line((0, 0), (FILLET1_R, 0))
        make_face()
    extrude(amount=11.25, mode=Mode.SUBTRACT)
    with BuildSketch(Plane(origin=(-31.7, -10.6, 28.95), x_dir=(0, 0, -1), z_dir=(1, 0, 0))) as fillet1_2_piece_16:
        with BuildLine():
            CenterArc((FILLET1_R, FILLET1_R), FILLET1_R, 180, 90)
            Line((0, FILLET1_R), (0, 0))
            Line((0, 0), (FILLET1_R, 0))
        make_face()
    extrude(amount=40.4, mode=Mode.SUBTRACT)
    with BuildSketch(Plane(origin=(-32.7, 0, 28.95), x_dir=(1, 0, 0), z_dir=(0, -1, 0)), Plane(origin=(9.7, 0, 28.95), x_dir=(0, 0, -1), z_dir=(0, -1, 0)), Plane(origin=(9.7, 0, 10.95), x_dir=(-1, 0, 0), z_dir=(0, -1, 0)), Plane(origin=(5.7, 0, -25.95), x_dir=(-1, 0, 0), z_dir=(0, -1, 0)), Plane(origin=(-32.7, 0, -25.95), x_dir=(0, 0, 1), z_dir=(0, -1, 0)), Plane(origin=(-32.7, 0, 0.7), x_dir=(1, 0, 0), z_dir=(0, -1, 0)), Plane(origin=(-32.7, 0, 15.7), x_dir=(0, 0, 1), z_dir=(0, -1, 0))) as fillet1_2_piece_17:
        with BuildLine():
            CenterArc((FILLET1_R, -FILLET1_R), FILLET1_R, 90, 90)
            Line((0, -FILLET1_R), (0, 0))
            Line((0, 0), (FILLET1_R, 0))
        make_face()
    extrude(amount=9.6, mode=Mode.SUBTRACT)
    with BuildSketch(Plane(origin=(8.7, -10.6, 10.95), x_dir=(0, 0, 1), z_dir=(-1, 0, 0)), Plane(origin=(-26.2, -10.6, 15.7), x_dir=(0, 0, 1), z_dir=(-1, 0, 0))) as fillet1_2_piece_18:
        with BuildLine():
            CenterArc((FILLET1_R, FILLET1_R), FILLET1_R, 180, 90)
            Line((0, FILLET1_R), (0, 0))
            Line((0, 0), (FILLET1_R, 0))
        make_face()
    extrude(amount=5.5, mode=Mode.SUBTRACT)


solid = part.part
